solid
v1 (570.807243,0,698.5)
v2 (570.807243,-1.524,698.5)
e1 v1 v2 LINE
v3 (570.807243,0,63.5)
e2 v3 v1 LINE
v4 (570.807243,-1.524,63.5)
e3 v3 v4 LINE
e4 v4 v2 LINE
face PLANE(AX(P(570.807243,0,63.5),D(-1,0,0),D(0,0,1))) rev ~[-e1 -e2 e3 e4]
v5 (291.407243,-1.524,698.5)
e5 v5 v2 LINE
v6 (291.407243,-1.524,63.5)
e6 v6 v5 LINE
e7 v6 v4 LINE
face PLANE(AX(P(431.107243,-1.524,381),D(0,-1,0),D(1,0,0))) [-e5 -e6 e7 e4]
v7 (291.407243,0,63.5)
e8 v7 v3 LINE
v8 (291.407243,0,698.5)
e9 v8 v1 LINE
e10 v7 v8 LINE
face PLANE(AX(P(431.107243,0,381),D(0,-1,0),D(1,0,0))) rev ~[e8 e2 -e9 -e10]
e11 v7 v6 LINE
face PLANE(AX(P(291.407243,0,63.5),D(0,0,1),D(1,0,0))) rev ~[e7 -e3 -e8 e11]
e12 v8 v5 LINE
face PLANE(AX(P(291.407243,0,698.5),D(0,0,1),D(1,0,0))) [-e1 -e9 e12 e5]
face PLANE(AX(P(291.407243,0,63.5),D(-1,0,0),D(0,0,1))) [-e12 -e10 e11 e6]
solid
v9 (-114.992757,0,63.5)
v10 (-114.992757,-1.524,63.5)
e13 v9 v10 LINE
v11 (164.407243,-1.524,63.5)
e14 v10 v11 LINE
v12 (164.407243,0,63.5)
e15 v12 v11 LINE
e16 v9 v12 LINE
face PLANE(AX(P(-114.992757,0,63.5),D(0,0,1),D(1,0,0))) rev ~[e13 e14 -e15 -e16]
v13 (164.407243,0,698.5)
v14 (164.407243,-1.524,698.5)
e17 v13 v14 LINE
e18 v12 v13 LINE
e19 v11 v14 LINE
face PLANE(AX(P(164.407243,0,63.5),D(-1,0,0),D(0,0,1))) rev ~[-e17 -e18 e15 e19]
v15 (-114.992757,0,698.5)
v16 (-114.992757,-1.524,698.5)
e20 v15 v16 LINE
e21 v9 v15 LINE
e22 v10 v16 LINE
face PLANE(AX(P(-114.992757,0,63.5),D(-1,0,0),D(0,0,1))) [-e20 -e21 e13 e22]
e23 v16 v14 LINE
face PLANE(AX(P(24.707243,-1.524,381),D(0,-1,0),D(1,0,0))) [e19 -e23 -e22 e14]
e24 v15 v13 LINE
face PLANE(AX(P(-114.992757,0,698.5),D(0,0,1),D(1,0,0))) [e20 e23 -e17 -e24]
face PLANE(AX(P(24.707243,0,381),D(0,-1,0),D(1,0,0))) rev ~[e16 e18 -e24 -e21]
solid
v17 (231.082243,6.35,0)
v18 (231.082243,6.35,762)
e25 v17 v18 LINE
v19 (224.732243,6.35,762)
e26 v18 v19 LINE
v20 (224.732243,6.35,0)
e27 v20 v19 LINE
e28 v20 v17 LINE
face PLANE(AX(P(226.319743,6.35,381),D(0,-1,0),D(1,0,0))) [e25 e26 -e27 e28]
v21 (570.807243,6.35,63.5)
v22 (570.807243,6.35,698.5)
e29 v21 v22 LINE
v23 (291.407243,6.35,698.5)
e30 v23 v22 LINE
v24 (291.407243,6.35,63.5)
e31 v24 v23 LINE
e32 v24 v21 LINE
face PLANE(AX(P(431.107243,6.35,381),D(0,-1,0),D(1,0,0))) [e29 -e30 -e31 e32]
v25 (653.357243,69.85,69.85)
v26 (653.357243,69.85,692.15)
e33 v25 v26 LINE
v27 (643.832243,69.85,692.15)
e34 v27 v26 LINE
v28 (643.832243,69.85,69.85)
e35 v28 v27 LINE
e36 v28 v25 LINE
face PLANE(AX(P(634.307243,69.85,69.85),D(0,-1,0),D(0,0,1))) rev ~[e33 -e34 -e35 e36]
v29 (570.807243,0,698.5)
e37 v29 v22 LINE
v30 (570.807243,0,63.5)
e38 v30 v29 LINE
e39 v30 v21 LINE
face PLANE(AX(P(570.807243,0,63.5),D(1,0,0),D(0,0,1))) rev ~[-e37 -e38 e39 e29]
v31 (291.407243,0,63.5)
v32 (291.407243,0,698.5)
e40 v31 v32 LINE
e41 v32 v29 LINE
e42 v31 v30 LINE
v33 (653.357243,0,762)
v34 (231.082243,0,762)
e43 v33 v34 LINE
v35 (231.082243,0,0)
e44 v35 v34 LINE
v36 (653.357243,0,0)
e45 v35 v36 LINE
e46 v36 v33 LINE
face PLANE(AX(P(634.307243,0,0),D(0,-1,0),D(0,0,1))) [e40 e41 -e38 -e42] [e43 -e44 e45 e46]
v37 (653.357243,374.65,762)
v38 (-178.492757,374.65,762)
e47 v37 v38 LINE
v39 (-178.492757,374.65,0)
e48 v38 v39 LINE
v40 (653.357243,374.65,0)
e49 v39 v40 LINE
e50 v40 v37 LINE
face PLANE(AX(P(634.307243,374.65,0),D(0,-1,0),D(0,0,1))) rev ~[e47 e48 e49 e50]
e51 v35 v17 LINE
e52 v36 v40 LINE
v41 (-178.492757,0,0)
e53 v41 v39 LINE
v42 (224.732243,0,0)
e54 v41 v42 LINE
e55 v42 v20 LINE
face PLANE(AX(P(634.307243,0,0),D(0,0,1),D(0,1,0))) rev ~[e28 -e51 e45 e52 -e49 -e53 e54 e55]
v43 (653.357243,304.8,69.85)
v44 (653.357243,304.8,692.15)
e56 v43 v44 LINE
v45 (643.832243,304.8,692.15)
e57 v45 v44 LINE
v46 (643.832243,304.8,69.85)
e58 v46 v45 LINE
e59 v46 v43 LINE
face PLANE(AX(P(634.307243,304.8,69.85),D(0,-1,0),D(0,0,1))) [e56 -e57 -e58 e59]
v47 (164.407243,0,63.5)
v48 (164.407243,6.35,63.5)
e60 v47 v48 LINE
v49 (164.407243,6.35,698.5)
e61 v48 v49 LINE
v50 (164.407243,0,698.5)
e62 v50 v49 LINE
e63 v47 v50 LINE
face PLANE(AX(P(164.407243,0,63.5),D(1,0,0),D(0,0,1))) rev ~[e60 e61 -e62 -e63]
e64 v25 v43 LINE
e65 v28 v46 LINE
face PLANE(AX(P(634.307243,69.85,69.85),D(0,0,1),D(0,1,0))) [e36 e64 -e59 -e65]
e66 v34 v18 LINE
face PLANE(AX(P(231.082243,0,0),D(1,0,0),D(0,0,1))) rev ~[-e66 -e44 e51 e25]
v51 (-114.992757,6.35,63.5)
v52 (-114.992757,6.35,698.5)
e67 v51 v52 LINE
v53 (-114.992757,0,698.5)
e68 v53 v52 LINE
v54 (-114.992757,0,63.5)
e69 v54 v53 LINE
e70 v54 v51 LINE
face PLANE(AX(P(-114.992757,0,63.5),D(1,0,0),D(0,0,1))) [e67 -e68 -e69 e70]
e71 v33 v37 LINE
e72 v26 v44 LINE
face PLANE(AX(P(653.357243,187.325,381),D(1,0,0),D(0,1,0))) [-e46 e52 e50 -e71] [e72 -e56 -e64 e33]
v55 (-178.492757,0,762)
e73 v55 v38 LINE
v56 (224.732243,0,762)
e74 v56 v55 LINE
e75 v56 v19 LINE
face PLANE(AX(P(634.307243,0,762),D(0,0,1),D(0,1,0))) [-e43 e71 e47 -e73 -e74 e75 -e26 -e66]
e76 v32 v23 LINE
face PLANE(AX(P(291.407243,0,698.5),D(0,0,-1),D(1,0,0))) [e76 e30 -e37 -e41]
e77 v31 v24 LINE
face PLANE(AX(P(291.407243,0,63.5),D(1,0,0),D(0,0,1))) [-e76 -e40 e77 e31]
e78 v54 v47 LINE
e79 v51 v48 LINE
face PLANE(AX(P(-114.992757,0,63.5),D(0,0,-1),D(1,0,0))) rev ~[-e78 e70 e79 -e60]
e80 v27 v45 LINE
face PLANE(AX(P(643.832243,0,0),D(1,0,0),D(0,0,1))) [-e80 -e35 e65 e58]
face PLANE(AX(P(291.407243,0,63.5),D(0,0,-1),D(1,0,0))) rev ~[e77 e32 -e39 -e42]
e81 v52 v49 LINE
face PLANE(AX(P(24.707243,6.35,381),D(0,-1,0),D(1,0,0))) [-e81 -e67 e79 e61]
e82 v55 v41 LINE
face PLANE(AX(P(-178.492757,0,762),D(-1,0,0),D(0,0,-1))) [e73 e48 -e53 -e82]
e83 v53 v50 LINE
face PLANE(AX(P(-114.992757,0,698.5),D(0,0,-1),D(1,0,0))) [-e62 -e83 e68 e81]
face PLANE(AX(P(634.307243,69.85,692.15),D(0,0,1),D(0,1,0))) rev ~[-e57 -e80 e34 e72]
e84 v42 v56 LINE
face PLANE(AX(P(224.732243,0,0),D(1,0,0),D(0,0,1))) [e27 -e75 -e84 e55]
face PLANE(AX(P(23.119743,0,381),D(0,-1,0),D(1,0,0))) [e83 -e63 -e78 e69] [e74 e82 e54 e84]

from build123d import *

# Parameters (mm, degrees)
F0_W     = 279.4
F0_H     = 635
F0_W_2   = 3.175
F0_H_2   = 762
F1_DEPTH = 374.65
F2_DEPTH = 6.35
F3_DEPTH = 1.524
F4_W     = 374.65
F4_H     = 762
F4_W_2   = 234.95
F4_H_2   = 622.3
F5_DEPTH = 19.05
F6_DEPTH = 9.525


# Not quite as in the source:
# - a feature names something its author has since deleted; it is built from what else it names


with BuildPart() as f1:
    # F0 (on Front) → F1 (new body)
    with BuildSketch(Plane.XZ):
        Polygon((-178.4927574873, 0), (224.7322425127, 0), (224.7322425127, 762), (151.7072425127, 762), (-178.4927574873, 762), align=None)
        with Locations((24.7072425127, 381)):
            Rectangle(F0_W, F0_H, mode=Mode.SUBTRACT)
        Polygon((231.0822425127, 762), (231.0822425127, 0), (634.3072425127, 0), (634.3072425127, 762), (304.1072425127, 762), align=None)
        with Locations((431.1072425127, 381)):
            Rectangle(F0_W, F0_H, mode=Mode.SUBTRACT)
        with Locations((24.7072425127, 381)):
            Rectangle(F0_W, F0_H)
        with Locations((431.1072425127, 381)):
            Rectangle(F0_W, F0_H)
        with Locations((226.3197425127, 381)):
            Rectangle(F0_W_2, F0_H_2)
        with Locations((229.4947425127, 381)):
            Rectangle(F0_W_2, F0_H_2)
    extrude(amount=-F1_DEPTH)

    # F0 (on Front) → F2 (cut)
    with BuildSketch(Plane.XZ):
        with Locations((226.3197425127, 381)):
            Rectangle(F0_W_2, F0_H_2)
        with Locations((229.4947425127, 381)):
            Rectangle(F0_W_2, F0_H_2)
        with Locations((24.7072425127, 381)):
            Rectangle(F0_W, F0_H)
        with Locations((431.1072425127, 381)):
            Rectangle(F0_W, F0_H)
    extrude(amount=-F2_DEPTH, mode=Mode.SUBTRACT)

    # F4 (on face) → F5 (join)
    with BuildSketch(Plane.YZ.offset(634.3072425127)):
        with Locations((187.325, 381)):
            Rectangle(F4_W, F4_H)
        with Locations((187.325, 381)):
            Rectangle(F4_W_2, F4_H_2, mode=Mode.SUBTRACT)
    extrude(amount=F5_DEPTH)

    # F6 (add): a face of the model
    f6_faces = [f1.faces().sort_by_distance(p)[0] for p in [
        (634.3072425127, 187.325, 381),
    ]]
    extrude(f6_faces, amount=F6_DEPTH)


with BuildPart() as f3:
    # F0 (on Front) → F3 (new body)
    with BuildSketch(Plane.XZ):
        with Locations((24.7072425127, 381)):
            Rectangle(F0_W, F0_H)
    extrude(amount=F3_DEPTH)


with BuildPart() as f3b:
    # F0 (on Front) → F3, piece 2 (new body)
    with BuildSketch(Plane.XZ):
        with Locations((431.1072425127, 381)):
            Rectangle(F0_W, F0_H)
    extrude(amount=F3_DEPTH)


solid = Compound([f1.part, f3.part, f3b.part])
